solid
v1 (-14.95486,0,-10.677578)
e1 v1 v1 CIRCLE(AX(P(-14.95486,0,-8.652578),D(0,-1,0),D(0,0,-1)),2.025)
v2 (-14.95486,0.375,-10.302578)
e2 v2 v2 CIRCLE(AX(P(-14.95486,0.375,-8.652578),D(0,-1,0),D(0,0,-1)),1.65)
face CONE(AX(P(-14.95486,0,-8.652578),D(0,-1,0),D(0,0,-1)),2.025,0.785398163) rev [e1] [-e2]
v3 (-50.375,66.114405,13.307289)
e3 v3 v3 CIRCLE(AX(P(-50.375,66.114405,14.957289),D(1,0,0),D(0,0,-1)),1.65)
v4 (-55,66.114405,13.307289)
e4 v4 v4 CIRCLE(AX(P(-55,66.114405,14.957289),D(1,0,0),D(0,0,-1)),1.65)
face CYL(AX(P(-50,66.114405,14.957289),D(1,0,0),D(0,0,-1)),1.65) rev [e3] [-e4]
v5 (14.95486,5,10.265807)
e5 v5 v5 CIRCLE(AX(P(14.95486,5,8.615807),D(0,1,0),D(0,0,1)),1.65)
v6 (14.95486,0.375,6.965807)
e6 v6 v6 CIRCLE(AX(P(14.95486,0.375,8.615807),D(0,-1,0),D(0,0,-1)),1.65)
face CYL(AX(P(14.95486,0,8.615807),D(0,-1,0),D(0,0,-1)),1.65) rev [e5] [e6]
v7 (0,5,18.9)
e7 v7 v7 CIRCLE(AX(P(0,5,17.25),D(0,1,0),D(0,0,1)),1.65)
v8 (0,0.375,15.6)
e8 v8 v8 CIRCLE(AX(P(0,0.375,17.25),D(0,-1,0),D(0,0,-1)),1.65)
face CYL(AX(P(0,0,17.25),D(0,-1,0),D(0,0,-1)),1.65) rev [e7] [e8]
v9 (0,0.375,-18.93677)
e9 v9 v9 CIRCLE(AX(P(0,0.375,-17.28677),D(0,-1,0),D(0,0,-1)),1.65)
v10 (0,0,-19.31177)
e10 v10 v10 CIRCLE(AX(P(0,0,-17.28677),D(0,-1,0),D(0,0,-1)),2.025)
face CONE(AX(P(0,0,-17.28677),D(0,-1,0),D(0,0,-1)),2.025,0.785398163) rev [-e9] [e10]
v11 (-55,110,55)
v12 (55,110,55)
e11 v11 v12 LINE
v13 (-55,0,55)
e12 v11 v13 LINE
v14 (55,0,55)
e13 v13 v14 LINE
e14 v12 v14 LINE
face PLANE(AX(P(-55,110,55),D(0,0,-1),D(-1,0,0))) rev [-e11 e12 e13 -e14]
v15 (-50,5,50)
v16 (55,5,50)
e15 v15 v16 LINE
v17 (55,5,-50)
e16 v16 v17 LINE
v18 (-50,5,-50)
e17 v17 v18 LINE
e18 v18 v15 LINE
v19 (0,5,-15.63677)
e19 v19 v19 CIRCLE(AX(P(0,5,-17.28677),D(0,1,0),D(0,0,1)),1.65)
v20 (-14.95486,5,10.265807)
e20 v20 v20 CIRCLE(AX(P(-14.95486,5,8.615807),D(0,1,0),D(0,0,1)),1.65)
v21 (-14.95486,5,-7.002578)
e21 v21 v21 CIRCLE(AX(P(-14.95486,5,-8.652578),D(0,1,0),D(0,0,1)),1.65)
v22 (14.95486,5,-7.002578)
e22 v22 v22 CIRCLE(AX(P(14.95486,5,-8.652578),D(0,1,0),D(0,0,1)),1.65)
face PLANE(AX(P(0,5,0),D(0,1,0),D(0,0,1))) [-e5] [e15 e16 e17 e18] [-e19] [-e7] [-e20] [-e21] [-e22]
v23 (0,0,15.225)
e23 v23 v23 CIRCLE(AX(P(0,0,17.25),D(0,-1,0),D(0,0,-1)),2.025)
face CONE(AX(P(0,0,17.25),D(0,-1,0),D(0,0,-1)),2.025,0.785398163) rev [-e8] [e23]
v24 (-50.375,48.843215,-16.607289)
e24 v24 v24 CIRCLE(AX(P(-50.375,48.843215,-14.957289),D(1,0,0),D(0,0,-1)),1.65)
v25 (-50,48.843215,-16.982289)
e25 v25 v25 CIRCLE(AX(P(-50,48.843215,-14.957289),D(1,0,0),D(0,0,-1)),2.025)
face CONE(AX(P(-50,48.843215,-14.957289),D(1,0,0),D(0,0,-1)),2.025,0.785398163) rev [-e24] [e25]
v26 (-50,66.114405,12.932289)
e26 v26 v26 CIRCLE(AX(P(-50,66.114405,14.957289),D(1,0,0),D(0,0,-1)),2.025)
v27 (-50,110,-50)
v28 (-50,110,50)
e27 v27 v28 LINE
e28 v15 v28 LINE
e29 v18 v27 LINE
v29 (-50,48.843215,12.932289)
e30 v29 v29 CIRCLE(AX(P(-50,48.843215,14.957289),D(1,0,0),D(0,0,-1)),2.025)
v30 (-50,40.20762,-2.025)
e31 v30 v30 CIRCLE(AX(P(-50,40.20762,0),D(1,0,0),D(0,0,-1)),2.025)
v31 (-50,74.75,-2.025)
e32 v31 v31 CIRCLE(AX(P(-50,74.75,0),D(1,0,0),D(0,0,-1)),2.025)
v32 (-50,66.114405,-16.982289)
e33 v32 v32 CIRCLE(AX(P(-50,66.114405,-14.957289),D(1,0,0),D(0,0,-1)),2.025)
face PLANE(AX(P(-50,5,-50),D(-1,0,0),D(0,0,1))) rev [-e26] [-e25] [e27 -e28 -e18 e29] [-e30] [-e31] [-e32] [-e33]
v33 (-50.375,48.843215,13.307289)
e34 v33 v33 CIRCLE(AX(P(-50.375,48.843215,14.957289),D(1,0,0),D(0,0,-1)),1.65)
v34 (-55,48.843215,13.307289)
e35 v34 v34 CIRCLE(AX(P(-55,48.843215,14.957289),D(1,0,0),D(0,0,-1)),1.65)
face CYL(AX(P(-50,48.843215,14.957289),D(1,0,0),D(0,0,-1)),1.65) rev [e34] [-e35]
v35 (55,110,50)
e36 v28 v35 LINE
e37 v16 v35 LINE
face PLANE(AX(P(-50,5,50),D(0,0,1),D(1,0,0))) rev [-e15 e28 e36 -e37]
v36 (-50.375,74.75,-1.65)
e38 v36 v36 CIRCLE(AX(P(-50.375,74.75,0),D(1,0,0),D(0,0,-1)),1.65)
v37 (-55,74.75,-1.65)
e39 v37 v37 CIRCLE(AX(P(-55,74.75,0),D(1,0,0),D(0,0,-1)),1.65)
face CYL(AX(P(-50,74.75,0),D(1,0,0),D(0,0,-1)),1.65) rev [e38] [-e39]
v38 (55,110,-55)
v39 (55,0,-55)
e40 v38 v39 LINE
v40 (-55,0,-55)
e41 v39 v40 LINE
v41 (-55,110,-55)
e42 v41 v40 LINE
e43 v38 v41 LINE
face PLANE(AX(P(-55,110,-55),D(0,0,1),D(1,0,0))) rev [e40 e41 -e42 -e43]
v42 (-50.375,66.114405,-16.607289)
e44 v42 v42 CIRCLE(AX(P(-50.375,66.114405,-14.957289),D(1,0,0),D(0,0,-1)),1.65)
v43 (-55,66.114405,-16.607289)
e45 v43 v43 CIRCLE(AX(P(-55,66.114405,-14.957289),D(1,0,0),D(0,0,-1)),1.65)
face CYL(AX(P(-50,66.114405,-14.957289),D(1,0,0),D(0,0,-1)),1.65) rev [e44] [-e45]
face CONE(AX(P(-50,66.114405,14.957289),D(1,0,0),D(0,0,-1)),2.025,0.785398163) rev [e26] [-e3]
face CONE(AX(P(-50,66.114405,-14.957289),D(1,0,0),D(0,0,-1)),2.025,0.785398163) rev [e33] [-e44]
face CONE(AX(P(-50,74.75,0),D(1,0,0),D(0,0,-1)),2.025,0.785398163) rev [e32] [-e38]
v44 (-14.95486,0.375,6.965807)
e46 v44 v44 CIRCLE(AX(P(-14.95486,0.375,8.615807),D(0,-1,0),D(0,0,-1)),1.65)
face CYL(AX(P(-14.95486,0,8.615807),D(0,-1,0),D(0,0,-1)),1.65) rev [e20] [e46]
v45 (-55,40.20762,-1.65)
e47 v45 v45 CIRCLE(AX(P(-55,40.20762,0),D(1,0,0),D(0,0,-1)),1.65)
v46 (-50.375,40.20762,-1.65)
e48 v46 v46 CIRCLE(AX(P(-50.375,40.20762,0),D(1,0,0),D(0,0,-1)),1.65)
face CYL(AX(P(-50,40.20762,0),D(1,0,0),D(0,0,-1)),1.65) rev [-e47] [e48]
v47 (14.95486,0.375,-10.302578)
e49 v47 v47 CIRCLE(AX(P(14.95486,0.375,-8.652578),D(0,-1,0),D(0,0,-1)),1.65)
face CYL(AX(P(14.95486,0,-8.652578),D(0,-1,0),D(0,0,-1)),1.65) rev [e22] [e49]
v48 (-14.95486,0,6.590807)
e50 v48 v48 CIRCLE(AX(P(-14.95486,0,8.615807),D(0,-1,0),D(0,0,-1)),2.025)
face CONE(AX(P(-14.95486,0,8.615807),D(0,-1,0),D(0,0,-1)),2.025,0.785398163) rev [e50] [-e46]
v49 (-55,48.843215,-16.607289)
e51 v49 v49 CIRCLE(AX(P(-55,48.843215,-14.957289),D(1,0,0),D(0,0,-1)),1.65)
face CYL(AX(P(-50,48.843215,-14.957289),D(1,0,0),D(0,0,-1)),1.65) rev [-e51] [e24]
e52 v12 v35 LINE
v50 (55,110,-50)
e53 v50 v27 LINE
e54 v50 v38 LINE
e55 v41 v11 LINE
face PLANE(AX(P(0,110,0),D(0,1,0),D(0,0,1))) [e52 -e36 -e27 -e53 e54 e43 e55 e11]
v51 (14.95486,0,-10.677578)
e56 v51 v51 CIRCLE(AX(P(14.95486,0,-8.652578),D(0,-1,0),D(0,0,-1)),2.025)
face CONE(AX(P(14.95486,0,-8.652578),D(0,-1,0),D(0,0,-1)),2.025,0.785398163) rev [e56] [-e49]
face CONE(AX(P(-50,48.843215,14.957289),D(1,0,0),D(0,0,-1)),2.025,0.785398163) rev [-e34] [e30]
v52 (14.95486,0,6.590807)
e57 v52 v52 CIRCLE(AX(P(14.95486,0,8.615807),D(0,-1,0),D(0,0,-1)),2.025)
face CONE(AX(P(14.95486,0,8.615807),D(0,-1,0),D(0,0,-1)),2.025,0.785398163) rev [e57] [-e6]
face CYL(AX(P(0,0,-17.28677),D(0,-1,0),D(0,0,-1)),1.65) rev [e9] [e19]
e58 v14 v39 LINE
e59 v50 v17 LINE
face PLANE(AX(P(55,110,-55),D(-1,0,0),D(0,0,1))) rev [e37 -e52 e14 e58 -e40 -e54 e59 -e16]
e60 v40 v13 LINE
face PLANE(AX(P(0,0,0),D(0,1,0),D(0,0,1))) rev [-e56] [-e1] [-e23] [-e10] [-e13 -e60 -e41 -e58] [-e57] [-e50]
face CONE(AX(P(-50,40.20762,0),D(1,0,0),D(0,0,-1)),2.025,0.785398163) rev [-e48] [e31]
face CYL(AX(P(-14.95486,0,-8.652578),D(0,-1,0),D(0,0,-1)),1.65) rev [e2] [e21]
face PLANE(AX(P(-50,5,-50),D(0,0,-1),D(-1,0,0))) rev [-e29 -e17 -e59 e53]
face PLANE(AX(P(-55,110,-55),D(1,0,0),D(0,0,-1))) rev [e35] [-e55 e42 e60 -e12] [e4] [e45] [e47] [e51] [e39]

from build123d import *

# Parameters (mm, degrees)
SKETCH_1_W                   = 110
SKETCH_1_H                   = 110
EXTRUDE_1_DEPTH              = 110
SKETCH_2_W                   = 100
SKETCH_2_H                   = 100
CUT_EXTRUDE_1_DEPTH          = 105
SKETCH_3_W                   = 13.484754144
SKETCH_3_H                   = 100
CUT_EXTRUDE_2_DEPTH          = 105
HOLE_WIZARD_M4_6_D           = 3.3
HOLE_WIZARD_M4_6_CSINK_D     = 4.05
HOLE_WIZARD_M4_6_CSINK_ANGLE = 90
HOLE_WIZARD_M4_7_D           = 3.3
HOLE_WIZARD_M4_7_CSINK_D     = 4.05
HOLE_WIZARD_M4_7_CSINK_ANGLE = 90
PATTERN_CIRCULAR_2_COUNT     = 6


# Read off the part's stored shape, not the designer's step: 阵列(圆周)1
with BuildPart() as part:
    # 草图1 → 凸台-拉伸1 (new body)
    with BuildSketch(Plane(origin=(0, 0, 0), x_dir=(1, 0, 0), z_dir=(0, 1, 0))):
        Rectangle(SKETCH_1_W, SKETCH_1_H)
    extrude(amount=EXTRUDE_1_DEPTH)

    # 草图2 → 切除-拉伸1 (cut)
    with BuildSketch(Plane(origin=(0, 110, 0), x_dir=(1, 0, 0), z_dir=(0, 1, 0))):
        Rectangle(SKETCH_2_W, SKETCH_2_H)
    extrude(amount=-CUT_EXTRUDE_1_DEPTH, mode=Mode.SUBTRACT)

    # 草图3 → 切除-拉伸2 (cut)
    with BuildSketch(Plane(origin=(0, 110, 0), x_dir=(1, 0, 0), z_dir=(0, 1, 0))):
        with Locations((56.742377072, 0)):
            Rectangle(SKETCH_3_W, SKETCH_3_H)
    extrude(amount=-CUT_EXTRUDE_2_DEPTH, mode=Mode.SUBTRACT)

    # M4 螺纹孔6 (through all)
    with Locations(Plane.XZ):
        with Locations((0, 17.25)):
            CounterSinkHole(HOLE_WIZARD_M4_6_D / 2, HOLE_WIZARD_M4_6_CSINK_D / 2, counter_sink_angle=HOLE_WIZARD_M4_6_CSINK_ANGLE)

    # 阵列(圆周)1 outline → 阵列(圆周)1 (revolve, cut)
    with BuildSketch(Plane(origin=(-14.954860189, 0, 8.615807444), x_dir=(1, 0, 0), z_dir=(0, 0, 1))):
        Polygon((1.65, 0.375), (1.65, 5), (0, 5), (0, 0), (2.025, 0), align=None)
    revolve(axis=Axis((-14.954860189, 0, 8.615807444), (0, 1, 0)), mode=Mode.SUBTRACT)

    # Pattern Circular 1 2 outline → Pattern Circular 1 2 (revolve, cut)
    with BuildSketch(Plane(origin=(-14.954860189, 0, -8.652577668), x_dir=(1, 0, 0), z_dir=(0, 0, 1))):
        Polygon((1.65, 0.375), (1.65, 5), (0, 5), (0, 0), (2.025, 0), align=None)
    revolve(axis=Axis((-14.954860189, 0, -8.652577668), (0, 1, 0)), mode=Mode.SUBTRACT)

    # Pattern Circular 1 3 outline → Pattern Circular 1 3 (revolve, cut)
    with BuildSketch(Plane.XY.offset(-17.286770224)):
        Polygon((1.65, 0.375), (1.65, 5), (0, 5), (0, 0), (2.025, 0), align=None)
    revolve(axis=Axis((0, 0, -17.286770224), (0, 1, 0)), mode=Mode.SUBTRACT)

    # Pattern Circular 1 4 outline → Pattern Circular 1 4 (revolve, cut)
    with BuildSketch(Plane(origin=(14.954860189, 0, -8.652577668), x_dir=(1, 0, 0), z_dir=(0, 0, 1))):
        Polygon((1.65, 0.375), (1.65, 5), (0, 5), (0, 0), (2.025, 0), align=None)
    revolve(axis=Axis((14.954860189, 0, -8.652577668), (0, 1, 0)), mode=Mode.SUBTRACT)

    # Pattern Circular 1 5 outline → Pattern Circular 1 5 (revolve, cut)
    with BuildSketch(Plane(origin=(14.954860189, 0, 8.615807444), x_dir=(1, 0, 0), z_dir=(0, 0, 1))):
        Polygon((1.65, 0.375), (1.65, 5), (0, 5), (0, 0), (2.025, 0), align=None)
    revolve(axis=Axis((14.954860189, 0, 8.615807444), (0, 1, 0)), mode=Mode.SUBTRACT)

    # M4 螺纹孔7 (through all)
    with Locations(Plane(origin=(-50, 0, 0), x_dir=(0, 0, -1), z_dir=(1, 0, 0))):
        with Locations((0, 74.75)):
            hole_wizard_m4_7 = CounterSinkHole(HOLE_WIZARD_M4_7_D / 2, HOLE_WIZARD_M4_7_CSINK_D / 2, counter_sink_angle=HOLE_WIZARD_M4_7_CSINK_ANGLE)

    # 阵列(圆周)2: M4 螺纹孔7 ×6 about axis
    pattern_circular_2_axis = Axis((0, 57.478809906, 0), (1, 0, 0))
    for i in range(1, PATTERN_CIRCULAR_2_COUNT):
        add(hole_wizard_m4_7.rotate(pattern_circular_2_axis, i * 360 / PATTERN_CIRCULAR_2_COUNT), mode=Mode.SUBTRACT)


solid = part.part
